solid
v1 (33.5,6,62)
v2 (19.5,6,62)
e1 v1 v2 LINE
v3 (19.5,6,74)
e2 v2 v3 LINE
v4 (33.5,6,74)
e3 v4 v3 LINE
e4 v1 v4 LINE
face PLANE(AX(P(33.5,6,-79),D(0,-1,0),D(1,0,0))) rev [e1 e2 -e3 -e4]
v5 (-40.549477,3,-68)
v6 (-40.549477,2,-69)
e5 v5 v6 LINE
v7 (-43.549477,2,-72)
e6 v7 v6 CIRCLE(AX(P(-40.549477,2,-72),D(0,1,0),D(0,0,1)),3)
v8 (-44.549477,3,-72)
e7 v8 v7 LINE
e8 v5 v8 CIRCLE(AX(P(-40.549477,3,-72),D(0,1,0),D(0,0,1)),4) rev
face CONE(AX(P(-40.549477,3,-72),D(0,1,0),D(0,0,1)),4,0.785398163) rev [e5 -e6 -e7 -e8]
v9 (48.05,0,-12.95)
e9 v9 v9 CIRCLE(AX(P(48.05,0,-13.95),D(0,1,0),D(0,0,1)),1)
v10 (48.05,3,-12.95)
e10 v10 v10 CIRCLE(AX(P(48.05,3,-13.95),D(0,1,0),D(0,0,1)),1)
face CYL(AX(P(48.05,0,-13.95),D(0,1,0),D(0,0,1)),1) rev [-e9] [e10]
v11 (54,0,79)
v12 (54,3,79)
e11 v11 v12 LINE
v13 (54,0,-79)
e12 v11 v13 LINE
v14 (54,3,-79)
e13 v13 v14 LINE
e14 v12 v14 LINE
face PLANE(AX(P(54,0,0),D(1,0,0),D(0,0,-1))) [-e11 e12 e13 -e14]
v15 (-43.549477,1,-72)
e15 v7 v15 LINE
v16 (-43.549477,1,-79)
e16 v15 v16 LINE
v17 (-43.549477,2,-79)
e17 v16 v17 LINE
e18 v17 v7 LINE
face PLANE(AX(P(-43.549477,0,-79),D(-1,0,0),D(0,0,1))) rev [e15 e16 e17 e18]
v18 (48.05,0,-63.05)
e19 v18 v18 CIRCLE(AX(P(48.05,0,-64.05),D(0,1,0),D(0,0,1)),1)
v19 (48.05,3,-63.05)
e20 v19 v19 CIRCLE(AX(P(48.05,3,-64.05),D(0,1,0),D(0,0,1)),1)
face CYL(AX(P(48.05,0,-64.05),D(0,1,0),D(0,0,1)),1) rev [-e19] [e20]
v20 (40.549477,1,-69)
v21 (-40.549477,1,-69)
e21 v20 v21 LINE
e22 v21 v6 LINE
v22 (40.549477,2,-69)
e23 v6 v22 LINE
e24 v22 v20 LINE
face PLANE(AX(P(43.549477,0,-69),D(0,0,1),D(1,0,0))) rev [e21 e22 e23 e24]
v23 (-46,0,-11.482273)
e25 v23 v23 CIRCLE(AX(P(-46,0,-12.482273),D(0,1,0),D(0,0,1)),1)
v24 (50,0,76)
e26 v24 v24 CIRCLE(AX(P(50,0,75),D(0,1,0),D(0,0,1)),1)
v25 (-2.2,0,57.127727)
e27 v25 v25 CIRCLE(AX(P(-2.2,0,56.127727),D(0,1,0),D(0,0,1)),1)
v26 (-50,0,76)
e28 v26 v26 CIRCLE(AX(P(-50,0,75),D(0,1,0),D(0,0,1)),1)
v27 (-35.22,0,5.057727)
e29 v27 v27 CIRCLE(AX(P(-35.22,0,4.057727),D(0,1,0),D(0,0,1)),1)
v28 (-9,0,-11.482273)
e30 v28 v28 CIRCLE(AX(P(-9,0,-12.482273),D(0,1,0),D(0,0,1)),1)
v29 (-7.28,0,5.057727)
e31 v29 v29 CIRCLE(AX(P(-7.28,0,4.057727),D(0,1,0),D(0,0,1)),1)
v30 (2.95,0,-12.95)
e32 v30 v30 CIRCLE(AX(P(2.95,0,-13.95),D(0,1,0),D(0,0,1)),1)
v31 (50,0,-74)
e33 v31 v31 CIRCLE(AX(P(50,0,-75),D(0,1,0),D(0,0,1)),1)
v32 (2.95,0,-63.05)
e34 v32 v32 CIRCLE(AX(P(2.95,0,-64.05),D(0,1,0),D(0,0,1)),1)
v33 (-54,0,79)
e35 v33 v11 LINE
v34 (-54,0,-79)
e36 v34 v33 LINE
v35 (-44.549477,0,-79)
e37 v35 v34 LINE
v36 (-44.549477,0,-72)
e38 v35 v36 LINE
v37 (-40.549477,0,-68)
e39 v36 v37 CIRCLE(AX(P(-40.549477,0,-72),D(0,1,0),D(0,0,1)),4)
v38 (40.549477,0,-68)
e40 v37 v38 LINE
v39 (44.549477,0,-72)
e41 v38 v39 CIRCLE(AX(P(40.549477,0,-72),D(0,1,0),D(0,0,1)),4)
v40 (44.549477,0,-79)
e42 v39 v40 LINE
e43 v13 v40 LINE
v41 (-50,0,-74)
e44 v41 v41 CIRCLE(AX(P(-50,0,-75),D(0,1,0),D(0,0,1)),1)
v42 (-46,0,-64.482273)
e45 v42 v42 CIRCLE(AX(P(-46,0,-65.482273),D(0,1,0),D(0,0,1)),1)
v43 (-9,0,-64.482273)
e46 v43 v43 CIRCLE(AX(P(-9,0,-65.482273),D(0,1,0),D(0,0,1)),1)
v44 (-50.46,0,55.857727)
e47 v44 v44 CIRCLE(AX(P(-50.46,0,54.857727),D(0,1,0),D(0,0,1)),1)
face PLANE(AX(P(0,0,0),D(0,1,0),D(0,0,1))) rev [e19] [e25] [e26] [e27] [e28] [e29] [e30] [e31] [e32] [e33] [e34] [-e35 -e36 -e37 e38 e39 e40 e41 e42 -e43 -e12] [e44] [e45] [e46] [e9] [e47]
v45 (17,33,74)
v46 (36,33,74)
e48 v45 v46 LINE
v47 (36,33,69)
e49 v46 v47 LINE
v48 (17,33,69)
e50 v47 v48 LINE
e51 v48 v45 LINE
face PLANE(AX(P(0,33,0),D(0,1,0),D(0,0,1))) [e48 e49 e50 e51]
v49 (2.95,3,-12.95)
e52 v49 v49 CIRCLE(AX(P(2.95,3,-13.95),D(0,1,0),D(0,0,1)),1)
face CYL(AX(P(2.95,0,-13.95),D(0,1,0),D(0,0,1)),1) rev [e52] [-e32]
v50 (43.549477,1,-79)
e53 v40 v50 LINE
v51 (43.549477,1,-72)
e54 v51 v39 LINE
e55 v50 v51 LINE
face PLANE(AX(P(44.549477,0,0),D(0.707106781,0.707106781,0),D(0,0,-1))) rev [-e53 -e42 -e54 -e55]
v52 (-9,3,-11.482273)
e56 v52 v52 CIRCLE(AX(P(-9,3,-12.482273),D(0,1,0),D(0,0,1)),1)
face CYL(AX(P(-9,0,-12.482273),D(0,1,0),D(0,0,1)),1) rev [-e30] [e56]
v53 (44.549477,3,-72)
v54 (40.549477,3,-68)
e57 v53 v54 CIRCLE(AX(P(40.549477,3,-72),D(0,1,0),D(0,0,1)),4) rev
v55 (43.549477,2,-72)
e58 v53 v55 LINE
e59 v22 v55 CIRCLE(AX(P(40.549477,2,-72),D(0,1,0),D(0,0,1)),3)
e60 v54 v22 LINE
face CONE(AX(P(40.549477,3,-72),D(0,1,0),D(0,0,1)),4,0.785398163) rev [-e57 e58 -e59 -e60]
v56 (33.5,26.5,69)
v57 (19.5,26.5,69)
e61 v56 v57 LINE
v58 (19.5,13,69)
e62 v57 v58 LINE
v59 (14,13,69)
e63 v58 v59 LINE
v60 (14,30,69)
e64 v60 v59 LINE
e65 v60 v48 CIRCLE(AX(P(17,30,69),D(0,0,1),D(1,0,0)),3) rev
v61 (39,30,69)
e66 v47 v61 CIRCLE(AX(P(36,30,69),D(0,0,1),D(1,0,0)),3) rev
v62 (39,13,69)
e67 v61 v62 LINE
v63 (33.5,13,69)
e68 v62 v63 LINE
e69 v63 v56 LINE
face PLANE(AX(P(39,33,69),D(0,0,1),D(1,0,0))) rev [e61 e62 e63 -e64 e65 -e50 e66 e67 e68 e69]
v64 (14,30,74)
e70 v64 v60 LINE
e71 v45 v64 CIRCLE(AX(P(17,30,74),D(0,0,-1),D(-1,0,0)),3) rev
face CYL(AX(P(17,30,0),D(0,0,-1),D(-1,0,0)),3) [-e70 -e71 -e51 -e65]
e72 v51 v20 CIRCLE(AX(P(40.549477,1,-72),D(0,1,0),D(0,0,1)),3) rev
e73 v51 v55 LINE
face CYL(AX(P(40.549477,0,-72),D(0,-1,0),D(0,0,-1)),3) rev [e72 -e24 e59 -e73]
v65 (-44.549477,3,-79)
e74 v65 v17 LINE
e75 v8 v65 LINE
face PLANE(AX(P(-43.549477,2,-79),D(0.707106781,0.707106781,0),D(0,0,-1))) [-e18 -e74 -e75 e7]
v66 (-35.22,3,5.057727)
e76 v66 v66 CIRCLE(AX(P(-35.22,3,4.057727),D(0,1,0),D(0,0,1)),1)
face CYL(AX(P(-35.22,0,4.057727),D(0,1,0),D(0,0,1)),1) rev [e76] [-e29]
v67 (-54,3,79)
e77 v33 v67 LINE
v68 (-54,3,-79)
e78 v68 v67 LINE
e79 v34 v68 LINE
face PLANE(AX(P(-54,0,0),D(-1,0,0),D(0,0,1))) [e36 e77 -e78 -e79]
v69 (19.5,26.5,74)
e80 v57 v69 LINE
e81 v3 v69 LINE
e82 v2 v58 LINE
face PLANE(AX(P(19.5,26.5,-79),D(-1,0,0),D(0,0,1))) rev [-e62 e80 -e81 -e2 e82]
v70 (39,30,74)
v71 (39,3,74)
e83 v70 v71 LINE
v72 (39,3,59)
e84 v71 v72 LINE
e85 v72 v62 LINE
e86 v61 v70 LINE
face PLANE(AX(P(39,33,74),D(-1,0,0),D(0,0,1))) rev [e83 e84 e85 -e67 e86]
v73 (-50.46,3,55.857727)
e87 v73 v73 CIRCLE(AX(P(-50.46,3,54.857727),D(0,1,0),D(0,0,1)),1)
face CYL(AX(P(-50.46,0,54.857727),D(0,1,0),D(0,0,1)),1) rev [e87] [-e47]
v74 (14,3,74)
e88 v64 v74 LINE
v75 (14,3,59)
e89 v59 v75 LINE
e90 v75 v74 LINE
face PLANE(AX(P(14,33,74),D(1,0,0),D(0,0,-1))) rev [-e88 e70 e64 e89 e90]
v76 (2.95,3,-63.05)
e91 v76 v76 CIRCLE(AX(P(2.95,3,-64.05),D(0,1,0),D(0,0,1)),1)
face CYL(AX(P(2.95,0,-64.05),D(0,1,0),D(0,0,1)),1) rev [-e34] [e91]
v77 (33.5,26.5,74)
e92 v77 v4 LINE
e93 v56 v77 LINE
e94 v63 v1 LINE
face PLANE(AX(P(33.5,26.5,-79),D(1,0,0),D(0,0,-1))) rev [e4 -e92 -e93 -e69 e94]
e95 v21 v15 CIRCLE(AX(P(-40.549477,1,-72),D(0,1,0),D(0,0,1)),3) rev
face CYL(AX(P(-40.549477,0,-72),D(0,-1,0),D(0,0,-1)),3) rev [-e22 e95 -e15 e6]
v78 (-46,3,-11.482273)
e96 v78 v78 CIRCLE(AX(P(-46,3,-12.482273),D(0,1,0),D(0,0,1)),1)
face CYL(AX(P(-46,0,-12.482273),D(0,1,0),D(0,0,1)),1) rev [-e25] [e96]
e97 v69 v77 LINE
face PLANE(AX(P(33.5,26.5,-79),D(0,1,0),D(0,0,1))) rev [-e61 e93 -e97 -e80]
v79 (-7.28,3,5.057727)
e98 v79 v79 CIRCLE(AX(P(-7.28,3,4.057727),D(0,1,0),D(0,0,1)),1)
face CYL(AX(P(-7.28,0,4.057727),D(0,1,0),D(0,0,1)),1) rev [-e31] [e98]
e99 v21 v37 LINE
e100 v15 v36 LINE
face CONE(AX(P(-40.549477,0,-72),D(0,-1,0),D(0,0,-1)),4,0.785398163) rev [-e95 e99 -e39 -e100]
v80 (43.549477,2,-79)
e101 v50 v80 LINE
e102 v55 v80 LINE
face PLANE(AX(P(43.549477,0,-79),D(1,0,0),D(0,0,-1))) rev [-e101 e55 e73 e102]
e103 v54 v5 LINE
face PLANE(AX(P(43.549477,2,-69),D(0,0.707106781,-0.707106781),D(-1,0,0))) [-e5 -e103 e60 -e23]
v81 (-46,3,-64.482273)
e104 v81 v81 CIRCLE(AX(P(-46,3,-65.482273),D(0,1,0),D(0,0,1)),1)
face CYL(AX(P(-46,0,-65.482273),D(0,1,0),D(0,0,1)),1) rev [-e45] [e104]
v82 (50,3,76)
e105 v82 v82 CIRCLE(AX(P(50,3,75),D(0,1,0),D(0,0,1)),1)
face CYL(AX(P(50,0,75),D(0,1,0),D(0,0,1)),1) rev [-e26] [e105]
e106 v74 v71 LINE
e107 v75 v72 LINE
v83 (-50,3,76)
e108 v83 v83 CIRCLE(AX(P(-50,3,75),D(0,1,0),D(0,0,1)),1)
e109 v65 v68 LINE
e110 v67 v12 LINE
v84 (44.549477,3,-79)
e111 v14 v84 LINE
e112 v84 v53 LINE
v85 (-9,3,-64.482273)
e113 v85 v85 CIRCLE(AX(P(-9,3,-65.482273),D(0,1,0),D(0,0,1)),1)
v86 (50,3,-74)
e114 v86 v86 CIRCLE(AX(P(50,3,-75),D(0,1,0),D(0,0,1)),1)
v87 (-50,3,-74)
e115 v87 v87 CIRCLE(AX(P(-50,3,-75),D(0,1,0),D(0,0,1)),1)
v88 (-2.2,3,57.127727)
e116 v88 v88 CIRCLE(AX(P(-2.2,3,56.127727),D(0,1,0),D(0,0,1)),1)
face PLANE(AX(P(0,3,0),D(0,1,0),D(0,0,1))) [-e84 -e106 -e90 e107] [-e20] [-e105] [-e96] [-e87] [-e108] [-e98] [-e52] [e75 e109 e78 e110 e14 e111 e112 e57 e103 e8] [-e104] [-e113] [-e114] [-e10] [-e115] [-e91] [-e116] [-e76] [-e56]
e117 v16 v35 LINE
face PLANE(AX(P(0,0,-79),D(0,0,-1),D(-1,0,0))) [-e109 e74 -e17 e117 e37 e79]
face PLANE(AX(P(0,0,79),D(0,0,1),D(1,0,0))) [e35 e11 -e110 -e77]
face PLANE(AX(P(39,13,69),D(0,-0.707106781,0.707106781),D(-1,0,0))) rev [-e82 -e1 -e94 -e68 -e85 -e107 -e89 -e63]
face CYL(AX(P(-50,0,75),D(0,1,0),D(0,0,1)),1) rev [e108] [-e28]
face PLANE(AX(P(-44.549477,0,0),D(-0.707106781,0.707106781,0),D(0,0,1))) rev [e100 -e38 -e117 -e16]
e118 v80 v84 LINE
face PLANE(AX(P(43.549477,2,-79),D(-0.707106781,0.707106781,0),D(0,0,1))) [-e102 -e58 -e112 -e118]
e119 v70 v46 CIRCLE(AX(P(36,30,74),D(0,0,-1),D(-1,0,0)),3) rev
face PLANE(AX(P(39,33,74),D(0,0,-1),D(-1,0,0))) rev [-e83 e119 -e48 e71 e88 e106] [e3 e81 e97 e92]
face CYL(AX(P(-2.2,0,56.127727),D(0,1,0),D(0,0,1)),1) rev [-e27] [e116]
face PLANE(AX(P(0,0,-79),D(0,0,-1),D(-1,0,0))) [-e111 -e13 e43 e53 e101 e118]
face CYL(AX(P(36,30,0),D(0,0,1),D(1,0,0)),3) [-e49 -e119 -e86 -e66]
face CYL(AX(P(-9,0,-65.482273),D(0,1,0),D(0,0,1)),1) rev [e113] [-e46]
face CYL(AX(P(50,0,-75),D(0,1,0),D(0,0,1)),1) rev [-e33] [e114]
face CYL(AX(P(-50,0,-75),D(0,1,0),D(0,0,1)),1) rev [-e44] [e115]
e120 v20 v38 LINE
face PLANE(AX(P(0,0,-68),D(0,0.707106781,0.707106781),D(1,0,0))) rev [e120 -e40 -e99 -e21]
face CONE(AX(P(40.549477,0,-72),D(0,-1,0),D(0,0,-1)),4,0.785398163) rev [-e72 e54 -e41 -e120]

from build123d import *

# Parameters (mm, degrees)
ESBO_O1_W                = 110
ESBO_O1_H                = 160
RESSALTO_EXTRUS_O1_DEPTH = 3
ESBO_O3_W                = 110
ESBO_O3_H                = 160
ESBO_O3_W_2              = 108
ESBO_O3_H_2              = 158
ESBO_O3_R                = 1
CORTE_EXTRUS_O1_DEPTH    = 98.128780493
ESBO_O5_W                = 87.098953266
ESBO_O5_H                = 10
CORTE_EXTRUS_O2_DEPTH    = 96.739229159
ESBO_O6_W                = 25
ESBO_O6_H                = 5
RESSALTO_EXTRUS_O2_DEPTH = 30
ESBO_O7_W                = 14
ESBO_O7_H                = 20.5
CORTE_EXTRUS_O3_DEPTH    = 171.202820188
ESBO_O8_R                = 1
CORTE_EXTRUS_O4_DEPTH    = 101.284595028
CHANFRO1_SIZE            = 10
FILETE1_R                = 3
FILETE2_R                = 3
CHANFRO2_SIZE            = 1


with BuildPart() as part:
    # Esboço1 → Ressalto-extrusão1 (new body)
    with BuildSketch(Plane(origin=(0, 0, 0), x_dir=(1, 0, 0), z_dir=(0, 1, 0))):
        Rectangle(ESBO_O1_W, ESBO_O1_H)
    extrude(amount=RESSALTO_EXTRUS_O1_DEPTH)

    # Esboço3 → Corte-extrusão1 (cut, through all)
    # profile 1 of 5: a face of its own
    with BuildSketch(Plane(origin=(0, 3, 0), x_dir=(1, 0, 0), z_dir=(0, 1, 0))):
        Rectangle(ESBO_O3_W, ESBO_O3_H)
        Rectangle(ESBO_O3_W_2, ESBO_O3_H_2, mode=Mode.SUBTRACT)
    # profile 2 of 5: a face of its own
    with BuildSketch(Plane(origin=(0, 3, 0), x_dir=(1, 0, 0), z_dir=(0, 1, 0))):
        with Locations(Location((-50, -75, 0), (0, 0, 270))):
            Circle(ESBO_O3_R)
    # profile 3 of 5: a face of its own
    with BuildSketch(Plane(origin=(0, 3, 0), x_dir=(1, 0, 0), z_dir=(0, 1, 0))):
        with Locations(Location((50, -75, 0), (0, 0, 270))):
            Circle(ESBO_O3_R)
    # profile 4 of 5: a face of its own
    with BuildSketch(Plane(origin=(0, 3, 0), x_dir=(1, 0, 0), z_dir=(0, 1, 0))):
        with Locations(Location((50, 75, 0), (0, 0, 270))):
            Circle(ESBO_O3_R)
    # profile 5 of 5: a face of its own
    with BuildSketch(Plane(origin=(0, 3, 0), x_dir=(1, 0, 0), z_dir=(0, 1, 0))):
        with Locations(Location((-50, 75, 0), (0, 0, 270))):
            Circle(ESBO_O3_R)
    extrude(amount=-CORTE_EXTRUS_O1_DEPTH, mode=Mode.SUBTRACT)

    # Esboço5 → Corte-extrusão2 (cut, through all)
    with BuildSketch(Plane(origin=(0, 3, 0), x_dir=(1, 0, 0), z_dir=(0, 1, 0))):
        with Locations((0, 74)):
            Rectangle(ESBO_O5_W, ESBO_O5_H)
    extrude(amount=-CORTE_EXTRUS_O2_DEPTH, mode=Mode.SUBTRACT)

    # Esboço6 → Ressalto-extrusão2 (add)
    with BuildSketch(Plane(origin=(0, 3, 0), x_dir=(1, 0, 0), z_dir=(0, 1, 0))):
        with Locations((26.5, -71.5)):
            Rectangle(ESBO_O6_W, ESBO_O6_H)
    extrude(amount=RESSALTO_EXTRUS_O2_DEPTH)

    # Esboço7 → Corte-extrusão3 (cut, through all)
    with BuildSketch(Plane.XY.offset(79)):
        with Locations((26.5, 16.25)):
            Rectangle(ESBO_O7_W, ESBO_O7_H)
    extrude(amount=-CORTE_EXTRUS_O3_DEPTH, mode=Mode.SUBTRACT)

    # Esboço8 → Corte-extrusão4 (cut, through all)
    with BuildSketch(Plane(origin=(0, 3, 0), x_dir=(1, 0, 0), z_dir=(0, 1, 0))):
        with Locations(Location((-50.46, -54.857726713, 0), (0, 0, 270))):
            Circle(ESBO_O8_R)
        with Locations(Location((-2.2, -56.127726713, 0), (0, 0, 270))):
            Circle(ESBO_O8_R)
        with Locations(Location((-7.28, -4.057726713, 0), (0, 0, 270))):
            Circle(ESBO_O8_R)
        with Locations(Location((-35.22, -4.057726713, 0), (0, 0, 270))):
            Circle(ESBO_O8_R)
        with Locations(Location((48.05, 13.95, 0), (0, 0, 270))):
            Circle(ESBO_O8_R)
        with Locations(Location((2.95, 13.95, 0), (0, 0, 270))):
            Circle(ESBO_O8_R)
        with Locations(Location((-9, 12.482273287, 0), (0, 0, 270))):
            Circle(ESBO_O8_R)
        with Locations(Location((-46, 12.482273287, 0), (0, 0, 270))):
            Circle(ESBO_O8_R)
        with Locations(Location((48.05, 64.05, 0), (0, 0, 270))):
            Circle(ESBO_O8_R)
        with Locations(Location((2.95, 64.05, 0), (0, 0, 270))):
            Circle(ESBO_O8_R)
        with Locations(Location((-9, 65.482273287, 0), (0, 0, 270))):
            Circle(ESBO_O8_R)
        with Locations(Location((-46, 65.482273287, 0), (0, 0, 270))):
            Circle(ESBO_O8_R)
    extrude(amount=-CORTE_EXTRUS_O4_DEPTH, mode=Mode.SUBTRACT)

    # Chanfro1
    # the kernel refuses this chamfer: 10 mm, written as the material it adds along each edge
    with BuildSketch(Plane(origin=(14, 3, 69), x_dir=(0, -0.02749587661058636, -0.9996219169112968), z_dir=(1, 0, 0))) as chanfro1_piece_1_section:
        Polygon((CHANFRO1_SIZE * 0.999621916911, CHANFRO1_SIZE * 0.0274958766106), (-CHANFRO1_SIZE * 0.0274958766106, CHANFRO1_SIZE * 0.999621916911), (0, 0), align=None)
    chanfro1_piece_1 = extrude(amount=25, mode=Mode.PRIVATE)
    chanfro1_piece_1 = split(chanfro1_piece_1, bisect_by=Plane(origin=(16.75, 6, 64.635027274), z_dir=(0, -1, 0)), keep=Keep.TOP, mode=Mode.PRIVATE)
    chanfro1_piece_1 = split(chanfro1_piece_1, bisect_by=Plane(origin=(19.5, 4.275363385, 64.635027274), z_dir=(-1, 0, 0)), keep=Keep.TOP, mode=Mode.PRIVATE)
    add(chanfro1_piece_1)
    with BuildSketch(Plane(origin=(14, 3, 69), x_dir=(0, -0.02749587661058636, -0.9996219169112968), z_dir=(1, 0, 0))) as chanfro1_piece_2_section:
        Polygon((CHANFRO1_SIZE * 0.999621916911, CHANFRO1_SIZE * 0.0274958766106), (-CHANFRO1_SIZE * 0.0274958766106, CHANFRO1_SIZE * 0.999621916911), (0, 0), align=None)
    chanfro1_piece_2 = extrude(amount=25, mode=Mode.PRIVATE)
    chanfro1_piece_2 = split(chanfro1_piece_2, bisect_by=Plane(origin=(16.75, 6, 66.852482787), z_dir=(0, 1, 0)), keep=Keep.TOP, mode=Mode.PRIVATE)
    chanfro1_piece_2 = split(chanfro1_piece_2, bisect_by=Plane(origin=(19.5, 8.478561277, 66.852482787), z_dir=(-1, 0, 0)), keep=Keep.TOP, mode=Mode.PRIVATE)
    add(chanfro1_piece_2)
    with BuildSketch(Plane(origin=(14, 3, 69), x_dir=(0, -0.02749587661058636, -0.9996219169112968), z_dir=(1, 0, 0))) as chanfro1_piece_3_section:
        Polygon((CHANFRO1_SIZE * 0.999621916911, CHANFRO1_SIZE * 0.0274958766106), (-CHANFRO1_SIZE * 0.0274958766106, CHANFRO1_SIZE * 0.999621916911), (0, 0), align=None)
    chanfro1_piece_3 = extrude(amount=25, mode=Mode.PRIVATE)
    chanfro1_piece_3 = split(chanfro1_piece_3, bisect_by=Plane(origin=(33.5, 4.275363385, 64.635027274), z_dir=(-1, 0, 0)), keep=Keep.TOP, mode=Mode.PRIVATE)
    chanfro1_piece_3 = split(chanfro1_piece_3, bisect_by=Plane(origin=(26.5, 6, 64.635027274), z_dir=(0, -1, 0)), keep=Keep.TOP, mode=Mode.PRIVATE)
    chanfro1_piece_3 = split(chanfro1_piece_3, bisect_by=Plane(origin=(19.5, 4.275363385, 64.635027274), z_dir=(1, 0, 0)), keep=Keep.TOP, mode=Mode.PRIVATE)
    add(chanfro1_piece_3)
    with BuildSketch(Plane(origin=(14, 3, 69), x_dir=(0, -0.02749587661058636, -0.9996219169112968), z_dir=(1, 0, 0))) as chanfro1_piece_4_section:
        Polygon((CHANFRO1_SIZE * 0.999621916911, CHANFRO1_SIZE * 0.0274958766106), (-CHANFRO1_SIZE * 0.0274958766106, CHANFRO1_SIZE * 0.999621916911), (0, 0), align=None)
    chanfro1_piece_4 = extrude(amount=25, mode=Mode.PRIVATE)
    chanfro1_piece_4 = split(chanfro1_piece_4, bisect_by=Plane(origin=(33.5, 4.275363385, 64.635027274), z_dir=(1, 0, 0)), keep=Keep.TOP, mode=Mode.PRIVATE)
    chanfro1_piece_4 = split(chanfro1_piece_4, bisect_by=Plane(origin=(36.25, 6, 64.635027274), z_dir=(0, -1, 0)), keep=Keep.TOP, mode=Mode.PRIVATE)
    add(chanfro1_piece_4)
    with BuildSketch(Plane(origin=(14, 3, 69), x_dir=(0, -0.02749587661058636, -0.9996219169112968), z_dir=(1, 0, 0))) as chanfro1_piece_5_section:
        Polygon((CHANFRO1_SIZE * 0.999621916911, CHANFRO1_SIZE * 0.0274958766106), (-CHANFRO1_SIZE * 0.0274958766106, CHANFRO1_SIZE * 0.999621916911), (0, 0), align=None)
    chanfro1_piece_5 = extrude(amount=25, mode=Mode.PRIVATE)
    chanfro1_piece_5 = split(chanfro1_piece_5, bisect_by=Plane(origin=(33.5, 8.478561277, 66.852482787), z_dir=(1, 0, 0)), keep=Keep.TOP, mode=Mode.PRIVATE)
    chanfro1_piece_5 = split(chanfro1_piece_5, bisect_by=Plane(origin=(36.25, 6, 66.852482787), z_dir=(0, 1, 0)), keep=Keep.TOP, mode=Mode.PRIVATE)
    add(chanfro1_piece_5)

    # Filete1
    filete1_edges = [part.edges().sort_by_distance(p)[0] for p in [
        (39, 33, 71.5),
        (14, 33, 71.5),
    ]]
    fillet(filete1_edges, radius=FILETE1_R)

    # Filete2
    filete2_edges = [part.edges().sort_by_distance(p)[0] for p in [
        (-43.549476633, 1.5, -69),
        (43.549476633, 1.5, -69),
    ]]
    fillet(filete2_edges, radius=FILETE2_R)

    # Chanfro2
    chanfro2_edges = [part.edges().sort_by_distance(p)[0] for p in [
        (43.549476633, 3, -75.5),
        (43.549476633, 0, -75.5),
        (0, 3, -69),
        (0, 0, -69),
        (42.670796977, 3, -69.878679656),
        (42.670796977, 0, -69.878679656),
        (-42.670796977, 3, -69.878679656),
        (-42.670796977, 0, -69.878679656),
        (-43.549476633, 0, -75.5),
        (-43.549476633, 3, -75.5),
    ]]
    chamfer(chanfro2_edges, length=CHANFRO2_SIZE)


solid = part.part
